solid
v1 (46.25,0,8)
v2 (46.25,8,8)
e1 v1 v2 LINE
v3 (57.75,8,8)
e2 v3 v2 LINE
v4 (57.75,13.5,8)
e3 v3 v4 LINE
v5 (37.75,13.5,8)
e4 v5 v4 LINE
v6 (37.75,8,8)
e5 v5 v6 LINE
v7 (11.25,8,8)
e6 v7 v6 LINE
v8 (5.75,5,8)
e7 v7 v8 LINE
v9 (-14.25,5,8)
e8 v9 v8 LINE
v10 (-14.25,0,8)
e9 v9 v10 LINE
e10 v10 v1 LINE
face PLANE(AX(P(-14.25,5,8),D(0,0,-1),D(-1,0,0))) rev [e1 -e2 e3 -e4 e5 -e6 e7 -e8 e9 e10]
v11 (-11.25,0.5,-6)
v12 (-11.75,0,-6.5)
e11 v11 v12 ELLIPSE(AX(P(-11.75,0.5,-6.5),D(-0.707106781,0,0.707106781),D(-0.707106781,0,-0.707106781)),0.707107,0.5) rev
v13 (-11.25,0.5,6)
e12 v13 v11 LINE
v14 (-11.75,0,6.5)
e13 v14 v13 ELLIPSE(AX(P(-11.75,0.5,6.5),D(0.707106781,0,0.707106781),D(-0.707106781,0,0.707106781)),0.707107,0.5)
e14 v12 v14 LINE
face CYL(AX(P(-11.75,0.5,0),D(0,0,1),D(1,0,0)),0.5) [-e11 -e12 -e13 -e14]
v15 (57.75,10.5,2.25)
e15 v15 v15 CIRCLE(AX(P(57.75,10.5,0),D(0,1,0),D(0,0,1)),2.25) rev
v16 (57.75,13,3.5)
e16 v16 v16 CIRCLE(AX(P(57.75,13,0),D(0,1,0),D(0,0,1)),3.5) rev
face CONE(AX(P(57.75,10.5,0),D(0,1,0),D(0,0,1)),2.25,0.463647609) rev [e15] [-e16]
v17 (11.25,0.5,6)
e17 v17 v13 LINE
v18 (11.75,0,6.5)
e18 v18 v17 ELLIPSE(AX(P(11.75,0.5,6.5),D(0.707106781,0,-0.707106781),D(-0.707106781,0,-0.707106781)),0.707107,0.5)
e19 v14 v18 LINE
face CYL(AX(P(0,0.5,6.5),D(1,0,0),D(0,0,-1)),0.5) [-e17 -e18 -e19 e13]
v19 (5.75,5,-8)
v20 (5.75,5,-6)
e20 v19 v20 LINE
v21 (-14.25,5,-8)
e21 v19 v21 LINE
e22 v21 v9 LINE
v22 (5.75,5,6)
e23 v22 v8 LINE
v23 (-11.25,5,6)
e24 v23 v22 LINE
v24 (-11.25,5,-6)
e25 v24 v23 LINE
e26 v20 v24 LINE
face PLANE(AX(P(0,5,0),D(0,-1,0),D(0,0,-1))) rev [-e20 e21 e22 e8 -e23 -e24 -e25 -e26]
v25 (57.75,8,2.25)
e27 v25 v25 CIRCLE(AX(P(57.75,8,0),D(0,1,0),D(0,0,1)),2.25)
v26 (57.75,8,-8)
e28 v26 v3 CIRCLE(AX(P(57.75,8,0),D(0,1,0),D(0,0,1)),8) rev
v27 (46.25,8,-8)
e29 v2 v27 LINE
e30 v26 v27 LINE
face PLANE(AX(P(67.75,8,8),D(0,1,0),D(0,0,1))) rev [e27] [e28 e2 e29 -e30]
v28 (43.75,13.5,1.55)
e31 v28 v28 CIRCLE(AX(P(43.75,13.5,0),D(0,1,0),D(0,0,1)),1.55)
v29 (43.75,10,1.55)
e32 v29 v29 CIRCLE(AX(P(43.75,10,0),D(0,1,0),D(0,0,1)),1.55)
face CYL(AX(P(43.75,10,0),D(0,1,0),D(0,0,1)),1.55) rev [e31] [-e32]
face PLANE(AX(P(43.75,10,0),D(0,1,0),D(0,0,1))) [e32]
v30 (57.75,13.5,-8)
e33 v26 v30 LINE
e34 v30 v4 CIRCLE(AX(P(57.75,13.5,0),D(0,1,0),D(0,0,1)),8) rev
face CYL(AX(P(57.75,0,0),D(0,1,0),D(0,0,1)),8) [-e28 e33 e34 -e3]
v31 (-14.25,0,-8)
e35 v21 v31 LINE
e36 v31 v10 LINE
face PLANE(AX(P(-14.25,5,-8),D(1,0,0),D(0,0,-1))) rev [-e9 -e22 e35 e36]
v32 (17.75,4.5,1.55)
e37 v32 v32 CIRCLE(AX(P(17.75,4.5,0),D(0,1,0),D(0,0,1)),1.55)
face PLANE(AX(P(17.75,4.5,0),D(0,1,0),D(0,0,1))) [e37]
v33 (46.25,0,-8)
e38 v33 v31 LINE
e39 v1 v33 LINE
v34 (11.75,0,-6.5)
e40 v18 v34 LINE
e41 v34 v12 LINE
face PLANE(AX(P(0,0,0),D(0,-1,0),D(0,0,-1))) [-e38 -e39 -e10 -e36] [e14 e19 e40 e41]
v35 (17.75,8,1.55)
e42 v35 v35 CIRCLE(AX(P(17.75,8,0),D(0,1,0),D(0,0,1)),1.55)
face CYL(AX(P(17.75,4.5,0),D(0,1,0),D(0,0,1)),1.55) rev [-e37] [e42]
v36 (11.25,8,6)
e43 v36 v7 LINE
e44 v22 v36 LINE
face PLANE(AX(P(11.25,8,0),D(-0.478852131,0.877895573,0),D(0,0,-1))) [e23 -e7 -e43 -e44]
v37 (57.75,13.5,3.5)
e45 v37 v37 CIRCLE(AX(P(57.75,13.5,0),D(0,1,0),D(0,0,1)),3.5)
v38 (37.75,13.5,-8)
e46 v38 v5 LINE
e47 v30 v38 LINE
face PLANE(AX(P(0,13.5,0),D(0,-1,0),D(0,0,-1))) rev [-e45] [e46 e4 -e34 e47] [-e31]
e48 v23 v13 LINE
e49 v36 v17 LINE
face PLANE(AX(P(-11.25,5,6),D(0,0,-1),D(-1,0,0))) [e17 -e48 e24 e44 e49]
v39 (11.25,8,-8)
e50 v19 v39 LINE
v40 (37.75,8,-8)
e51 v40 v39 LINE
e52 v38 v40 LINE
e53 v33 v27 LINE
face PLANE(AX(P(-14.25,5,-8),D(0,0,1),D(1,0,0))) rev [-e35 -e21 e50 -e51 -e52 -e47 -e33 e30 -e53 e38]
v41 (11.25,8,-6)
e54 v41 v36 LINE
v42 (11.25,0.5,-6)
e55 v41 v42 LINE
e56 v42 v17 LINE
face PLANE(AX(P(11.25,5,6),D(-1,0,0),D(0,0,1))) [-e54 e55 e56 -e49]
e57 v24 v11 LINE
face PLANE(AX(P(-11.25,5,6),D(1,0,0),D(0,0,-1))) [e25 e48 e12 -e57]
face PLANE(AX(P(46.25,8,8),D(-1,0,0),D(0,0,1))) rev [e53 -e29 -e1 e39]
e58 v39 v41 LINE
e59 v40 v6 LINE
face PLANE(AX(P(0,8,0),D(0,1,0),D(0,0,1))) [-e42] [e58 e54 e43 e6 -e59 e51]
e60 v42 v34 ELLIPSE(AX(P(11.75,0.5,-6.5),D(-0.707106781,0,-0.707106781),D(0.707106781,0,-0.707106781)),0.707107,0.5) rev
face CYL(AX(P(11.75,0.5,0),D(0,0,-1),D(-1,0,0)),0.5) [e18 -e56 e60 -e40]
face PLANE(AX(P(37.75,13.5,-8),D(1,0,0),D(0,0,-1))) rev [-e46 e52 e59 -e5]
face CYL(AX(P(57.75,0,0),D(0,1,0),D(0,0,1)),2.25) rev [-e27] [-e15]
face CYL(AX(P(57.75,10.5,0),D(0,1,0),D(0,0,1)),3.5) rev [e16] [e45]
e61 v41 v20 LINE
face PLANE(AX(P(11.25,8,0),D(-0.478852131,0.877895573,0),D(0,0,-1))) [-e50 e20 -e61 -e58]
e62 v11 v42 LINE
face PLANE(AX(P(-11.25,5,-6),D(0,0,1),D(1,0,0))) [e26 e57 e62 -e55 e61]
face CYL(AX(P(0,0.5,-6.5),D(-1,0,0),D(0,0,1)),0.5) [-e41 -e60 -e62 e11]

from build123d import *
from OCP.BRepFilletAPI import BRepFilletAPI_MakeChamfer

# Parameters (mm, degrees)
SKETCH1_W               = 34.25
SKETCH1_H               = 16
SKETCH1_W_2             = 22.5
SKETCH1_H_2             = 12
BOSS_EXTRUDE2_DEPTH     = 5
SKETCH4_W               = 16
SKETCH4_H               = 5
BOSS_EXTRUDE3_DEPTH     = 2
BOSS_EXTRUDE4_DEPTH     = 3
SKETCH6_R               = 1.55
CUT_EXTRUDE1_DEPTH      = 3.5
FILLET1_R               = 0.5
SKETCH8_W               = 25.75
SKETCH8_H               = 16
BOSS_EXTRUDE5_DEPTH     = 8
SKETCH9_W               = 10
SKETCH9_H               = 16
BOSS_EXTRUDE6_DEPTH     = 5.5
SKETCH10_R              = 1.55
CUT_EXTRUDE2_DEPTH      = 3.5
SKETCH11_W              = 16
SKETCH11_H              = 5.5
BOSS_EXTRUDE7_DEPTH     = 20
CUT_EXTRUDE3_DEPTH      = 70.543601431
CUT_EXTRUDE3_DEPTH_BACK = 70.543601431
SKETCH12_R              = 2.25
SKETCH13_R              = 3.5
CUT_EXTRUDE4_DEPTH      = 3
SKETCH14_W              = 1.5
SKETCH14_H              = 8
CUT_EXTRUDE5_DEPTH      = 70.002264456
CHAMFER1_SIZE2          = 1.25
CHAMFER1_SIZE           = 2.5
CHAMFER2_SIZE           = 5.5
CHAMFER2_SIZE_2         = 3


with BuildPart() as part:
    # Sketch1 → Boss-Extrude2 (new body)
    with BuildSketch(Plane(origin=(0, 0, 0), x_dir=(1, 0, 0), z_dir=(0, 1, 0))):
        with Locations((2.875, 0)):
            Rectangle(SKETCH1_W, SKETCH1_H)
        Rectangle(SKETCH1_W_2, SKETCH1_H_2, mode=Mode.SUBTRACT)
    extrude(amount=BOSS_EXTRUDE2_DEPTH)

    # Sketch4 → Boss-Extrude3 (add)
    with BuildSketch(Plane(origin=(20, 0, 0), x_dir=(0, 0, -1), z_dir=(1, 0, 0))):
        with Locations((0, 2.5)):
            Rectangle(SKETCH4_W, SKETCH4_H)
    extrude(amount=BOSS_EXTRUDE3_DEPTH)

    # Sketch3 → Boss-Extrude4 (add)
    with BuildSketch(Plane(origin=(0, 5, 0), x_dir=(1, 0, 0), z_dir=(0, 1, 0))):
        Polygon((5.75, 6), (11.25, 6), (11.25, -6), (5.75, -6), (5.75, -8), (22, -8), (22, 8), (5.75, 8), align=None)
    extrude(amount=BOSS_EXTRUDE4_DEPTH)

    # Sketch6 → Cut-Extrude1 (cut)
    with BuildSketch(Plane(origin=(0, 8, 0), x_dir=(1, 0, 0), z_dir=(0, 1, 0))):
        with Locations(Location((17.75, 0, 0), (0, 0, 270))):
            Circle(SKETCH6_R)
    extrude(amount=-CUT_EXTRUDE1_DEPTH, mode=Mode.SUBTRACT)

    # Fillet1
    fillet1_edges = [part.edges().sort_by_distance(p)[0] for p in [
        (11.25, 0, 0),
        (0, 0, -6),
        (-11.25, 0, 0),
        (0, 0, 6),
    ]]
    fillet(fillet1_edges, radius=FILLET1_R)

    # Sketch8 → Boss-Extrude5 (add)
    with BuildSketch(Plane(origin=(0, 8, 0), x_dir=(1, 0, 0), z_dir=(0, 1, 0))):
        with Locations((34.875, 0)):
            Rectangle(SKETCH8_W, SKETCH8_H)
    extrude(amount=-BOSS_EXTRUDE5_DEPTH)

    # Sketch9 → Boss-Extrude6 (add)
    with BuildSketch(Plane(origin=(0, 8, 0), x_dir=(1, 0, 0), z_dir=(0, 1, 0))):
        with Locations((42.75, 0)):
            Rectangle(SKETCH9_W, SKETCH9_H)
    extrude(amount=BOSS_EXTRUDE6_DEPTH)

    # Sketch10 → Cut-Extrude2 (cut)
    with BuildSketch(Plane(origin=(0, 13.5, 0), x_dir=(1, 0, 0), z_dir=(0, 1, 0))):
        with Locations(Location((43.75, 0, 0), (0, 0, 270))):
            Circle(SKETCH10_R)
    extrude(amount=-CUT_EXTRUDE2_DEPTH, mode=Mode.SUBTRACT)

    # Sketch11 → Boss-Extrude7 (add)
    with BuildSketch(Plane(origin=(47.75, 0, 0), x_dir=(0, 0, -1), z_dir=(1, 0, 0))):
        with Locations((0, 10.75)):
            Rectangle(SKETCH11_W, SKETCH11_H)
    extrude(amount=BOSS_EXTRUDE7_DEPTH)

    # Sketch12 → Cut-Extrude3 (cut, two sides: drawn at the far end of the back side and taken through both)
    with BuildSketch(Plane(origin=(0, 13.5, 0), x_dir=(1, 0, 0), z_dir=(0, 1, 0)).offset(-CUT_EXTRUDE3_DEPTH_BACK)):
        with Locations(Location((57.75, 0, 0), (0, 0, 270))):
            Circle(SKETCH12_R)
        with BuildLine():
            Line((57.75, 8), (67.75, 8))
            Line((67.75, 8), (67.75, -8))
            Line((67.75, -8), (57.75, -8))
            ThreePointArc((57.75, -8), (65.75, 0), (57.75, 8))
        make_face()
    extrude(amount=CUT_EXTRUDE3_DEPTH + CUT_EXTRUDE3_DEPTH_BACK, mode=Mode.SUBTRACT)

    # Sketch13 → Cut-Extrude4 (cut)
    with BuildSketch(Plane(origin=(0, 13.5, 0), x_dir=(1, 0, 0), z_dir=(0, 1, 0))):
        with Locations(Location((57.75, 0, 0), (0, 0, 270))):
            Circle(SKETCH13_R)
    extrude(amount=-CUT_EXTRUDE4_DEPTH, mode=Mode.SUBTRACT)

    # Sketch14 → Cut-Extrude5 (cut, through all)
    with BuildSketch(Plane(origin=(0, 0, -8), x_dir=(-1, 0, 0), z_dir=(0, 0, -1))):
        with Locations((-47, 4)):
            Rectangle(SKETCH14_W, SKETCH14_H)
    extrude(amount=-CUT_EXTRUDE5_DEPTH, mode=Mode.SUBTRACT)

    # Chamfer1
    chamfer1_edges = [part.edges().sort_by_distance(p)[0] for p in [
        (57.75, 10.5, -3.5),
    ]]
    chamfer1_side = [part.faces().sort_by_distance(p)[0] for p in [
        (57.75, 10.525, -3.5),
    ]]
    chamfer(chamfer1_edges, length=CHAMFER1_SIZE - 0.0001, length2=CHAMFER1_SIZE2 - 0.0001, reference=chamfer1_side[0])  # a hair under: the kernel refuses the full size

    # Chamfer2
    chamfer2_edges_1 = [part.edges().sort_by_distance(p)[0] for p in [
        (5.75, 8, 7),
    ]]
    chamfer2_side_1 = [part.faces().sort_by_distance(p)[0] for p in [
        (5.81, 8, 7),
    ]]
    chamfer2_edges_2 = [part.edges().sort_by_distance(p)[0] for p in [
        (5.75, 8, -7),
    ]]
    chamfer2_side_2 = [part.faces().sort_by_distance(p)[0] for p in [
        (5.81, 8, -7),
    ]]
    chamfer2 = BRepFilletAPI_MakeChamfer(part.part.solid().wrapped)
    for e in chamfer2_edges_1:
        chamfer2.Add(CHAMFER2_SIZE - 0.0001, CHAMFER2_SIZE_2 - 0.0001, e.wrapped, chamfer2_side_1[0].wrapped)
    for e in chamfer2_edges_2:
        chamfer2.Add(CHAMFER2_SIZE - 0.0001, CHAMFER2_SIZE_2 - 0.0001, e.wrapped, chamfer2_side_2[0].wrapped)
    add(Compound.cast(chamfer2.Shape()), mode=Mode.REPLACE)  # a hair under: the kernel refuses the full size


solid = part.part
